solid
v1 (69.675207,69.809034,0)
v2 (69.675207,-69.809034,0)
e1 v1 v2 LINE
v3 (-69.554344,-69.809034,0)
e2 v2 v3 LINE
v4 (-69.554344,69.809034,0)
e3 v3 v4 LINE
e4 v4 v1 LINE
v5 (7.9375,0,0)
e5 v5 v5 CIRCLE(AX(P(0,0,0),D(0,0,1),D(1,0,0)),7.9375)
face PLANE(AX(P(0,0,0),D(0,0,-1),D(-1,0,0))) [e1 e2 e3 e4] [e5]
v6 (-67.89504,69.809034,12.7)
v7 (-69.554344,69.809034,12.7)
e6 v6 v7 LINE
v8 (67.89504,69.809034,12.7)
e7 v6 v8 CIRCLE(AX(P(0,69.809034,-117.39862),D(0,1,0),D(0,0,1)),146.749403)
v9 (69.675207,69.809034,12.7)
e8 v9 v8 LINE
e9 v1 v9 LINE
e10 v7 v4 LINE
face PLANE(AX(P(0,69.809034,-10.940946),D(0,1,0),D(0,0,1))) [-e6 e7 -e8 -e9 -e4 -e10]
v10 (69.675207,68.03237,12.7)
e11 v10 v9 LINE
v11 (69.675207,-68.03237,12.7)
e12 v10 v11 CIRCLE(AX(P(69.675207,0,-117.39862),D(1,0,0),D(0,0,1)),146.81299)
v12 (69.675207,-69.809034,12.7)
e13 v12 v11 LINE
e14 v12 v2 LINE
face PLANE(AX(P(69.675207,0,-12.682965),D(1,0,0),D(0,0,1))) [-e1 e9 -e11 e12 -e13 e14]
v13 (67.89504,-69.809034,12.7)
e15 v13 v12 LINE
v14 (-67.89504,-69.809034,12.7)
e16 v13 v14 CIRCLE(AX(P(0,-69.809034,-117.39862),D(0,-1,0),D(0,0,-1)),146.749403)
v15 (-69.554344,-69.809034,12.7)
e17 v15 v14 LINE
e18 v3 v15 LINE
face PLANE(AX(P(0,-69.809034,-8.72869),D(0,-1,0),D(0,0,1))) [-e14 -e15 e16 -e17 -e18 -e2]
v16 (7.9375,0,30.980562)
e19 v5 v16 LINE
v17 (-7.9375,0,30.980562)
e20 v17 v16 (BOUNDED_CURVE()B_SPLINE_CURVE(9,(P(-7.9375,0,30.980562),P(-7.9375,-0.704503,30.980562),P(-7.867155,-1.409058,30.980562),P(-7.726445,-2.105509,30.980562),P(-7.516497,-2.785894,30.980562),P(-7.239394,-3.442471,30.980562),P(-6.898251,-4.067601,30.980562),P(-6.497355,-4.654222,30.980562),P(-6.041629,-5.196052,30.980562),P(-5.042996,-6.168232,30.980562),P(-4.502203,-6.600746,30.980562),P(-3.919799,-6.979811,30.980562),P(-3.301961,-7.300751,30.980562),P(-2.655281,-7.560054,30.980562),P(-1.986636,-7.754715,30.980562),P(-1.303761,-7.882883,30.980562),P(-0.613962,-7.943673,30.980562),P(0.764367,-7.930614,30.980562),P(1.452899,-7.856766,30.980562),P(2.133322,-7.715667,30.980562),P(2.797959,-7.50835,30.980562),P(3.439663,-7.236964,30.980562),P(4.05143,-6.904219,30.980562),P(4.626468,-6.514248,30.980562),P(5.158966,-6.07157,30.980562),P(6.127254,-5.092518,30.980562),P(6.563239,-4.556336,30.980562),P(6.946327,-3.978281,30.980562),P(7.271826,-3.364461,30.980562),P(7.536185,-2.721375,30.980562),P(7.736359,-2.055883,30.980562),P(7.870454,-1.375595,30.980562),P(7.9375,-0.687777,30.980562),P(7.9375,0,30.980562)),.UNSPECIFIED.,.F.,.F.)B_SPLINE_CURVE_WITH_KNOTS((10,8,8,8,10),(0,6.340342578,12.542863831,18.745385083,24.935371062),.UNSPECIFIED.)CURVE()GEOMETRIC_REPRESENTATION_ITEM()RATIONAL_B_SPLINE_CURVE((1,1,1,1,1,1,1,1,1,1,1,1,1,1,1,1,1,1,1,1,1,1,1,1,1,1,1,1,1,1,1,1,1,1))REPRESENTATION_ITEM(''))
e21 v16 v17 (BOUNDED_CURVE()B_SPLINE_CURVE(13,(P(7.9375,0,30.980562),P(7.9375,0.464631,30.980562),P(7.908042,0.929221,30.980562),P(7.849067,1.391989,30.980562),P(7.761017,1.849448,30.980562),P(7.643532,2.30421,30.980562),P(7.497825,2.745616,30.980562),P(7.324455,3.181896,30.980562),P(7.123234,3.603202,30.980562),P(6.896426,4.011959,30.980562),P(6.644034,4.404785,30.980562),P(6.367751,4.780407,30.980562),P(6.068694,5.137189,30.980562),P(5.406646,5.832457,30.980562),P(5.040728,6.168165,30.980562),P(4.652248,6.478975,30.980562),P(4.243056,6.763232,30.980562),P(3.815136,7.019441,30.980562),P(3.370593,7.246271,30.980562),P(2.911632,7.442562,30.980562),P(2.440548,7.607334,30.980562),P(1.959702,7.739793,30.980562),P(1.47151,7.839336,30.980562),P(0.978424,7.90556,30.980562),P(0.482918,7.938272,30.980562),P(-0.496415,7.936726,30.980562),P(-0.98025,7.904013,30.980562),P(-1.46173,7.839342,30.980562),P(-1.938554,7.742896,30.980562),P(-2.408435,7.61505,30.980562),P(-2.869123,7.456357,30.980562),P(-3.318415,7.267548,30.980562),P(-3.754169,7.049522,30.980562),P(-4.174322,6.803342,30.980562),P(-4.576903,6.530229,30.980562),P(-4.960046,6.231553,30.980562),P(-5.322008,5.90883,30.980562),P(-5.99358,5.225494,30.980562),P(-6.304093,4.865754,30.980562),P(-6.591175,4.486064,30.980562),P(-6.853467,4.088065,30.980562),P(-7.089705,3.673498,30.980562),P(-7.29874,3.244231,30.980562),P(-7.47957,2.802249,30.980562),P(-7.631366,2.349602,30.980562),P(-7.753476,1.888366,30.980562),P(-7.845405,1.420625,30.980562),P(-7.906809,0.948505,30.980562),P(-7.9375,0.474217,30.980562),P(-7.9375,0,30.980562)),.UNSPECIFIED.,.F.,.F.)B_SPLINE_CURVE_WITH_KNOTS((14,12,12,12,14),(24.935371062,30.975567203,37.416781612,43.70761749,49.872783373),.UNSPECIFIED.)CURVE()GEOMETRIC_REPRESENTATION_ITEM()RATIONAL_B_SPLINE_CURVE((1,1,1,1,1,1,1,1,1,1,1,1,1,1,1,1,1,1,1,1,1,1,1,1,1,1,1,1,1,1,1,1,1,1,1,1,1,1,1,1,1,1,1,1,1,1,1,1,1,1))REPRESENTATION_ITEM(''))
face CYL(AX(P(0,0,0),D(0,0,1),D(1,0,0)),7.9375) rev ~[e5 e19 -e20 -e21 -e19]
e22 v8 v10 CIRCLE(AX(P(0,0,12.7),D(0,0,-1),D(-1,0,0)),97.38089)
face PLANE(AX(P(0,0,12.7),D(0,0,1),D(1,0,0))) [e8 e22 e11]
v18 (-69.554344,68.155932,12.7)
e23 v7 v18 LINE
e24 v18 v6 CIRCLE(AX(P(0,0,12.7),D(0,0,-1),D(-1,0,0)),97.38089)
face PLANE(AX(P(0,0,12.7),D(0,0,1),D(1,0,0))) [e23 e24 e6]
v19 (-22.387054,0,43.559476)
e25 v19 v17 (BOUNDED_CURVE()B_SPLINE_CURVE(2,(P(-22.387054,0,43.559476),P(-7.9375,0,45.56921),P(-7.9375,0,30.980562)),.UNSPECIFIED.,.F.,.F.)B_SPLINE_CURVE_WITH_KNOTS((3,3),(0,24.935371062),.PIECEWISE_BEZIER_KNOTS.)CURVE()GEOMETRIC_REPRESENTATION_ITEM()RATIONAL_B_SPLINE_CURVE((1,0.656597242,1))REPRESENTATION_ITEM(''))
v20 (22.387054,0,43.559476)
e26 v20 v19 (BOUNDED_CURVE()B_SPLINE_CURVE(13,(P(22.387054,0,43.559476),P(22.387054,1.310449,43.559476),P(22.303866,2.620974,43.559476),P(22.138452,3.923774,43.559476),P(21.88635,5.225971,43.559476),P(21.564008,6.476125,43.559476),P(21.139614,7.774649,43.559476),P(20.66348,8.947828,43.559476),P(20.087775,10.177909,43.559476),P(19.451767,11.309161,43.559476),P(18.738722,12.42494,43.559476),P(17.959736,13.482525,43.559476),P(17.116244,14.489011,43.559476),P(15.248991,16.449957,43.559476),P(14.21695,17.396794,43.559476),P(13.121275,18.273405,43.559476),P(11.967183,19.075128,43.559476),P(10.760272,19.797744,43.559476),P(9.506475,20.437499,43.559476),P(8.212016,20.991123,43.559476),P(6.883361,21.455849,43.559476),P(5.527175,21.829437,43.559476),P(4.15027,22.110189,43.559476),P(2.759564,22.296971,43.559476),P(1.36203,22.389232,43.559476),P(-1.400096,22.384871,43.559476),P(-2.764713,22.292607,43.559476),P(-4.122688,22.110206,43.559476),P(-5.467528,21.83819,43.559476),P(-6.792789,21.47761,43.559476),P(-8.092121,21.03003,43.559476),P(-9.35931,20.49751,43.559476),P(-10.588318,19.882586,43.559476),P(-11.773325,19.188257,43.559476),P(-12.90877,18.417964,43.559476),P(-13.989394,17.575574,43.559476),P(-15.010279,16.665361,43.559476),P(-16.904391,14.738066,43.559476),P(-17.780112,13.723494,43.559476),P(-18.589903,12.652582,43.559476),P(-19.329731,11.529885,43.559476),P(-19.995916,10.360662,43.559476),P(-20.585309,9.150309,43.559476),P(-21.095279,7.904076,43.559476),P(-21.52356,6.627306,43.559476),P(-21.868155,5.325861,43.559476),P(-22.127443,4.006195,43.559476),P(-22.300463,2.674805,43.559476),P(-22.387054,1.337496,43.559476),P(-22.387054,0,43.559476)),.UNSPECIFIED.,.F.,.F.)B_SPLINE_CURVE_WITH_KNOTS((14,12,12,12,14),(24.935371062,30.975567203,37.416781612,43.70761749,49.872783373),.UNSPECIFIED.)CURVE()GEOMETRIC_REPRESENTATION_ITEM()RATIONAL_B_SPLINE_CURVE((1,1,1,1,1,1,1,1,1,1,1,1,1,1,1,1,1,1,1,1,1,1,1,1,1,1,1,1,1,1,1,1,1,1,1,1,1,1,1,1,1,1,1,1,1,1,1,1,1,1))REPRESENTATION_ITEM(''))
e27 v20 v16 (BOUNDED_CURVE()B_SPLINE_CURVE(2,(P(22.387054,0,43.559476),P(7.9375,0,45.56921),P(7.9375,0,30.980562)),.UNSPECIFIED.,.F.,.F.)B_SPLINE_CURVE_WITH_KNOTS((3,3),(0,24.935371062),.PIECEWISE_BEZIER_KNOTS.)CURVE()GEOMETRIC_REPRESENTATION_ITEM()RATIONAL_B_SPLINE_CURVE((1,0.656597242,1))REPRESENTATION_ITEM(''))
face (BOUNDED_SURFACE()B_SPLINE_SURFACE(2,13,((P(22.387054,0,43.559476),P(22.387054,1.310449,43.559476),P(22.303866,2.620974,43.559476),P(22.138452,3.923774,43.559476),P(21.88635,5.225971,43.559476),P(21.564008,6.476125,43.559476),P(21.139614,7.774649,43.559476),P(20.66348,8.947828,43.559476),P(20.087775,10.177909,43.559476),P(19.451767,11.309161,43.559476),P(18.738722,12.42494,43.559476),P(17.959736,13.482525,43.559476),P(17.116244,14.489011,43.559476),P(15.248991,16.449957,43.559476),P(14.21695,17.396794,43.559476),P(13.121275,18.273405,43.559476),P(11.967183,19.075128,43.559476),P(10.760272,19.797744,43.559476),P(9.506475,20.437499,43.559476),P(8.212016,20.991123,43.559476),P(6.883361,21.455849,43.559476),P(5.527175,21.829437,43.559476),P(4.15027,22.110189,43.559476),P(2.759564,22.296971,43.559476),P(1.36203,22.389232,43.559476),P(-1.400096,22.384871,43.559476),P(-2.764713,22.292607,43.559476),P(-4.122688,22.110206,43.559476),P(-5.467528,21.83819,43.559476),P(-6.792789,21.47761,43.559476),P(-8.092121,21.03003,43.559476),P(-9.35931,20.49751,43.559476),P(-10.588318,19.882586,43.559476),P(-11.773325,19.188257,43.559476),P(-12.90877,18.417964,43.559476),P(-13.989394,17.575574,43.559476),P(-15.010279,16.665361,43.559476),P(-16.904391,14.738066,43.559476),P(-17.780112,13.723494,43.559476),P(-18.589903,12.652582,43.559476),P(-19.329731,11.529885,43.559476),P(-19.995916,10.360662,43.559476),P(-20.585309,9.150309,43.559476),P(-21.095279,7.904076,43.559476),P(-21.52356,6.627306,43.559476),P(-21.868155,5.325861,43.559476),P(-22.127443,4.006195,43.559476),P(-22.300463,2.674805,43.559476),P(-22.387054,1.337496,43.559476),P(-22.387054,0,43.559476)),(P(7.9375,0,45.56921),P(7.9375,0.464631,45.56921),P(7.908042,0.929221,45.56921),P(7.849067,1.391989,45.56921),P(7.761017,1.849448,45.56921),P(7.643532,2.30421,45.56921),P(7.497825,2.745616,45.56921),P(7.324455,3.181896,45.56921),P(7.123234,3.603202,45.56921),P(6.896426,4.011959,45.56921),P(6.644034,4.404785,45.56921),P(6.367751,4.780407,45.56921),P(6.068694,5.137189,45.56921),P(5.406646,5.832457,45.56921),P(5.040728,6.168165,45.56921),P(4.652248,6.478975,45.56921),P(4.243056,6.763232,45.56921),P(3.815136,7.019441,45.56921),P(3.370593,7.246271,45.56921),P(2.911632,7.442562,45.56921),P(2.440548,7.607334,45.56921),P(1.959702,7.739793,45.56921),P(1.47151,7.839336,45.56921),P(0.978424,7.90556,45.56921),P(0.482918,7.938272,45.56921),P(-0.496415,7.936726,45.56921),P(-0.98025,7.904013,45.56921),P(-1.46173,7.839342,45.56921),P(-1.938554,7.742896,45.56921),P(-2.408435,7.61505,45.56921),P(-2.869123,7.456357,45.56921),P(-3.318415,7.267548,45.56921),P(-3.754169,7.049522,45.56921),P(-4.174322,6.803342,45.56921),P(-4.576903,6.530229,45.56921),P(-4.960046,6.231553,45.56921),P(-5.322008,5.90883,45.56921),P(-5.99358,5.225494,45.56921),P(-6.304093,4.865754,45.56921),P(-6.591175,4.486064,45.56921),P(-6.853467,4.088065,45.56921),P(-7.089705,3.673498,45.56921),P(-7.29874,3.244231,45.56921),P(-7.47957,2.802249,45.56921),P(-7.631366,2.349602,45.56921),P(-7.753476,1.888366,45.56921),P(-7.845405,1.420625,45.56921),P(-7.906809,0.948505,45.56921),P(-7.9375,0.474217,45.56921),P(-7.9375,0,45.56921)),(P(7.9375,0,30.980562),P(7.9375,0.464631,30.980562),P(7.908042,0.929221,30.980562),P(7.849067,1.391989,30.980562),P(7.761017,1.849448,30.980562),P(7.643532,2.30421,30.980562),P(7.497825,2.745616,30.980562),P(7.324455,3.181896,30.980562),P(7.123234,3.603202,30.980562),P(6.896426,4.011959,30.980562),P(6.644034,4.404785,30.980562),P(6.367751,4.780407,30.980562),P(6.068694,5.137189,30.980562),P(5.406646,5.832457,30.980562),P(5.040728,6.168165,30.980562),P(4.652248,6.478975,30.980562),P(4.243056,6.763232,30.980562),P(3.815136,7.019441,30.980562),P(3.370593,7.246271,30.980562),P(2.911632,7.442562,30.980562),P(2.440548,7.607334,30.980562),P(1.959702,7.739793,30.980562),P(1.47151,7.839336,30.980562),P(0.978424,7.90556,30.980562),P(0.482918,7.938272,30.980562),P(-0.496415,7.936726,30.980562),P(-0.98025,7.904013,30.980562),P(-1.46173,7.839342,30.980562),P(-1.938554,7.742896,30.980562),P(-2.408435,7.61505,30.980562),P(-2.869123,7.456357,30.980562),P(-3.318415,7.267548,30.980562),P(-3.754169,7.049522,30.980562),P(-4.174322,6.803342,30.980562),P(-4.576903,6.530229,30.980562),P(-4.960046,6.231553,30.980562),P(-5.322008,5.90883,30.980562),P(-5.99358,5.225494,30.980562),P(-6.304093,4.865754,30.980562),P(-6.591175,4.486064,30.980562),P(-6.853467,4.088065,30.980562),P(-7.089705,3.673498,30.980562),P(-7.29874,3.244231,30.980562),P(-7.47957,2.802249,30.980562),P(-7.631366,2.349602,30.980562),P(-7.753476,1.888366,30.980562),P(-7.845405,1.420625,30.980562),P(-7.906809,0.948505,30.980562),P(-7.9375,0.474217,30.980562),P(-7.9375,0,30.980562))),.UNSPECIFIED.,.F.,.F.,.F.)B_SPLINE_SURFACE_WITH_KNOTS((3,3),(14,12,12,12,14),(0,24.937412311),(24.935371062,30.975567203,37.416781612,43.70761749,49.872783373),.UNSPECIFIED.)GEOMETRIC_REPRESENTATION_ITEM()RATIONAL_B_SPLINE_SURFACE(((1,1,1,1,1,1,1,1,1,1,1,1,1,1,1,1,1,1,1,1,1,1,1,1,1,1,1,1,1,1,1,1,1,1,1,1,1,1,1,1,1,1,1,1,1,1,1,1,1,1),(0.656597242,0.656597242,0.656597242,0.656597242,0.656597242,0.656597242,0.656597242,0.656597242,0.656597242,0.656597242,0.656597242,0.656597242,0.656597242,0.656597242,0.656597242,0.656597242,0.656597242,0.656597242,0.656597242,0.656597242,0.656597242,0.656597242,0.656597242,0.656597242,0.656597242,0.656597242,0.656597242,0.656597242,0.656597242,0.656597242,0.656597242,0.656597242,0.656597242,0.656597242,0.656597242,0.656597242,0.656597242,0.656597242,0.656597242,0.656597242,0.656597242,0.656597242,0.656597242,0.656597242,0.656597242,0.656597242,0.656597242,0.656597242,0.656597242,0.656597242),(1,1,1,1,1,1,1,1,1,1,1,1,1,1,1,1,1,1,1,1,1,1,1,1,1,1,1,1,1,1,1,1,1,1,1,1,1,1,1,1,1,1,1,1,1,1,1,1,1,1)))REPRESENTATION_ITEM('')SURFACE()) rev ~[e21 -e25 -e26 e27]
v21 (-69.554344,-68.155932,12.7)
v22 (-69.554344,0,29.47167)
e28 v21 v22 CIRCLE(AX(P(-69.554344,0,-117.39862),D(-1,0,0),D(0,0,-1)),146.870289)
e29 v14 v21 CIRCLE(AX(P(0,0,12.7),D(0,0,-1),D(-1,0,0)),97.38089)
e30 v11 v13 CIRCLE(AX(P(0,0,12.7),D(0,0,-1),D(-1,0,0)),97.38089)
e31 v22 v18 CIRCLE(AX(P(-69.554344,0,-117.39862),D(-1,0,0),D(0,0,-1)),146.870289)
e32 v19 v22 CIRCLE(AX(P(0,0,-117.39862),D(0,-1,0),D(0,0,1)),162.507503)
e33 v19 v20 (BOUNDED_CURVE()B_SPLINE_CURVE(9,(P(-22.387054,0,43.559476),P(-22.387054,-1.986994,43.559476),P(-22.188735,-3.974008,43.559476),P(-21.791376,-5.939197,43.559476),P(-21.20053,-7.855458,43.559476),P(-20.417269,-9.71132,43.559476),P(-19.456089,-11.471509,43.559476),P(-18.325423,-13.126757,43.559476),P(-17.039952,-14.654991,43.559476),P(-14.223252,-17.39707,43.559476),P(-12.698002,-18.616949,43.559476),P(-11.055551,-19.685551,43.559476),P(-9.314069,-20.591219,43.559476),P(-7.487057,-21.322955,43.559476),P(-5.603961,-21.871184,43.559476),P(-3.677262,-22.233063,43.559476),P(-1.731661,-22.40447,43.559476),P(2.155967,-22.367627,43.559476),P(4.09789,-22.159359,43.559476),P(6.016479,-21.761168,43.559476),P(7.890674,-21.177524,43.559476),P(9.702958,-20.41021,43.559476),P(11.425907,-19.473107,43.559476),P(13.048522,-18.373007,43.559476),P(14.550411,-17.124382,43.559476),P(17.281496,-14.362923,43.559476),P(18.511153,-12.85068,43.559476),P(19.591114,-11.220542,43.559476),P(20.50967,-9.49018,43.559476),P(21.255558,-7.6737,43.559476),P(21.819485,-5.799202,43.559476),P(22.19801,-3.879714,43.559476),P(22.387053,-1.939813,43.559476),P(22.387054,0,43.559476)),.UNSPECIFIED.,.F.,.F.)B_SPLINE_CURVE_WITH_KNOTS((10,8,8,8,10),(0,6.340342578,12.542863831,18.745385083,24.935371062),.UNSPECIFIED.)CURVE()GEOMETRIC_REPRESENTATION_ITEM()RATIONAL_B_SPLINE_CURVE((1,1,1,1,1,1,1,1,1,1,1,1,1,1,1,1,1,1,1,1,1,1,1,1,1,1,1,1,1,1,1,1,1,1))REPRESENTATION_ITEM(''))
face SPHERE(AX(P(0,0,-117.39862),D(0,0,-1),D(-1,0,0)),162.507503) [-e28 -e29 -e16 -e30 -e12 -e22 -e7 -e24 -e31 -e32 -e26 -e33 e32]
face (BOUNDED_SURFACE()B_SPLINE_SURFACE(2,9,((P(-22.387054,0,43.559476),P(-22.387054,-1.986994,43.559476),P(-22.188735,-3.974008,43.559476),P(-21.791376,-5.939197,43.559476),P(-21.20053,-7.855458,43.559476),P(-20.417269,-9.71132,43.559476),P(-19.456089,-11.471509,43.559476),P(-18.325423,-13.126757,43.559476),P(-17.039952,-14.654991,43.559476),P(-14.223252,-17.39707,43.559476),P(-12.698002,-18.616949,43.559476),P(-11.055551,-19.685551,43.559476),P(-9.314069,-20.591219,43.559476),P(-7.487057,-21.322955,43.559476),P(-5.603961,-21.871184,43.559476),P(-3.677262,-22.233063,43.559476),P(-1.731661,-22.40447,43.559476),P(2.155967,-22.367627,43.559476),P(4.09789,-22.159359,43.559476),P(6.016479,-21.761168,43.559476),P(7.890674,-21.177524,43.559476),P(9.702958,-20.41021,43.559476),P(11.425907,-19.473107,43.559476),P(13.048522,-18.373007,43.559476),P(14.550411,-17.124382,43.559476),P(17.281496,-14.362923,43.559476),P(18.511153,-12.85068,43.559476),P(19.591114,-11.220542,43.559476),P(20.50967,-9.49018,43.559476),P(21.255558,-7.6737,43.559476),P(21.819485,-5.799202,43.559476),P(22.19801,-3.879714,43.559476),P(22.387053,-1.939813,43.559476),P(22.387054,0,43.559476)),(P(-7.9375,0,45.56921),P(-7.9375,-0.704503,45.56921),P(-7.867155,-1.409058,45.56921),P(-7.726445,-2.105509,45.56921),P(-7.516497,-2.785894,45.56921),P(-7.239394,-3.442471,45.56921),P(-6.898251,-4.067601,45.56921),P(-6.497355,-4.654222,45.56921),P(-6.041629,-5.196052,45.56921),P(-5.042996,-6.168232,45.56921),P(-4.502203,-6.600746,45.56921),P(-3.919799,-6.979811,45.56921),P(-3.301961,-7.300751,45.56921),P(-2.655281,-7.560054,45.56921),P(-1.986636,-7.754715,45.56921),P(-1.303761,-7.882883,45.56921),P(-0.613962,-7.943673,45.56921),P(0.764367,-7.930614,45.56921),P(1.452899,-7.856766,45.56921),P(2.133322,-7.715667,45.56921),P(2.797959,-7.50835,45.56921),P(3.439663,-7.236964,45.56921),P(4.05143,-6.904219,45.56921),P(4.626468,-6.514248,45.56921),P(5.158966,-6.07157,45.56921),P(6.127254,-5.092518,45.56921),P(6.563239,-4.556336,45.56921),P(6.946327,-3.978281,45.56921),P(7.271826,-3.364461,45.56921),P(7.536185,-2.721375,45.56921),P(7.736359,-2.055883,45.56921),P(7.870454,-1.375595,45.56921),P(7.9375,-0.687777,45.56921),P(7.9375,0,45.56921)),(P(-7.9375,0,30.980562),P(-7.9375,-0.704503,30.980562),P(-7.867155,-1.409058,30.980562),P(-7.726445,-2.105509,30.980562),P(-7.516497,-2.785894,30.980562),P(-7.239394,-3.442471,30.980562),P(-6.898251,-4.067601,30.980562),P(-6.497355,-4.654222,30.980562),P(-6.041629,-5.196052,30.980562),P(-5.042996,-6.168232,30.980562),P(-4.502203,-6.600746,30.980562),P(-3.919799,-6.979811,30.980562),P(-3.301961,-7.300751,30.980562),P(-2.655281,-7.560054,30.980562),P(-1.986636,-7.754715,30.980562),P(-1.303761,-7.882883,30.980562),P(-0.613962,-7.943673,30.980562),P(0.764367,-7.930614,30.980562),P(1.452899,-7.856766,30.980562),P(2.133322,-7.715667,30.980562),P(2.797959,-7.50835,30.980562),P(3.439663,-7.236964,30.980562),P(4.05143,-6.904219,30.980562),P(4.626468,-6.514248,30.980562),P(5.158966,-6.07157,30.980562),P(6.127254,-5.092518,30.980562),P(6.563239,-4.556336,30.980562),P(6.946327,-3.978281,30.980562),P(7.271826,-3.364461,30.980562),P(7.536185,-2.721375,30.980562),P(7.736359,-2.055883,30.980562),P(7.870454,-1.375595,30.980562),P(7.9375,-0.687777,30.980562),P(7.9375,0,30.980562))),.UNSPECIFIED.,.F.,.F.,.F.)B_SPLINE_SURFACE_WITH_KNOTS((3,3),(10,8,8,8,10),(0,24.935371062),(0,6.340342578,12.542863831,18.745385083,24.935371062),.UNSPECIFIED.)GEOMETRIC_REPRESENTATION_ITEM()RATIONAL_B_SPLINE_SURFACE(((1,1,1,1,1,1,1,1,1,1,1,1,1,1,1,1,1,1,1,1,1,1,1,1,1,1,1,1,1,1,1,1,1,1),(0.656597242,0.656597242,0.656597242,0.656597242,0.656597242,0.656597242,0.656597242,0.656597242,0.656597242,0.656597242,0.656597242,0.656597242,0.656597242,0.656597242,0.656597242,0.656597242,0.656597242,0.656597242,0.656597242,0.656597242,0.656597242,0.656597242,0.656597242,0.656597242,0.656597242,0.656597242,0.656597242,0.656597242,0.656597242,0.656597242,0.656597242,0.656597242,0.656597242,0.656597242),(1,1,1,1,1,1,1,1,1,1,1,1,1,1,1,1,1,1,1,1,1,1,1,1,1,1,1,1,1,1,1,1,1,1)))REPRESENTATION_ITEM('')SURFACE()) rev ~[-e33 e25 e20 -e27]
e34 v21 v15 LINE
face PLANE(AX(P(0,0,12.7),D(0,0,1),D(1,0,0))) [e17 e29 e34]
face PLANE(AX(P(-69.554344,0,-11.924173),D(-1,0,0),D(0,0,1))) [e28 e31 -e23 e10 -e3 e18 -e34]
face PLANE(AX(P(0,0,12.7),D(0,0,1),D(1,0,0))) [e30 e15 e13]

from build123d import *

# Parameters (mm, degrees)
F0_W     = 139.7
F0_H     = 139.7
F0_R     = 7.9375
F1_DEPTH = 12.7
F4_W     = 59.6992075443
F4_H     = 63.3541112766
F4_W_2   = 56.6389337182
F4_H_2   = 62.1770434082
F5_DEPTH = 101.6
F6_W     = 47.2303777933
F6_H     = 39.3290324137
F6_W_2   = 46.0887253284
F6_H_2   = 41.5412890725
F7_DEPTH = 101.6
F9_DEPTH = 76.2
F10_R    = 12.7


# Not quite as in the source:
# - a feature names something its author has since deleted; it is built from what else it names


with BuildPart() as f1:
    # F0 (on Top) → F1 (new body)
    with BuildSketch(Plane.XY):
        Rectangle(F0_W, F0_H)
        Circle(F0_R, mode=Mode.SUBTRACT)
    extrude(amount=F1_DEPTH)

    # F2 (on Front) → F3 (revolve)
    with BuildSketch(Plane.XZ):
        with BuildLine():
            Line((0, 0), (0, 45.1088836892))
            ThreePointArc((0, 45.1088836892), (-60.5414406288, 33.4106062222), (-112.3665997793, 0))
            Line((-112.3665997793, 0), (0, 0))
        make_face()
    revolve(axis=Axis((0, 0, 22.5544418446), (0, 0, -1)))

    # F4 (on Front) → F5 (cut, symmetric)
    with BuildSketch(Plane.XZ):
        with Locations((-99.4039475918, 19.7528828867)):
            Rectangle(F4_W, F4_H)
        with Locations((97.9946739972, 18.4055566788)):
            Rectangle(F4_W_2, F4_H_2)
    extrude(amount=F5_DEPTH, both=True, mode=Mode.SUBTRACT)

    # F6 (on Right) → F7 (cut, symmetric)
    with BuildSketch(Plane.YZ):
        with Locations((-93.4242233634, 10.9358266927)):
            Rectangle(F6_W, F6_H)
        with Locations((92.853397131, 9.8296983633)):
            Rectangle(F6_W_2, F6_H_2)
    extrude(amount=F7_DEPTH, both=True, mode=Mode.SUBTRACT)

    # F0 (on Top) → F9 (cut, symmetric)
    with BuildSketch(Plane.XY):
        Circle(F0_R)
    extrude(amount=F9_DEPTH, both=True, mode=Mode.SUBTRACT)

    # F10
    f10_edges = [f1.edges().sort_by_distance(p)[0] for p in [
        (0, -7.9375, 44.914919),
        (0, 7.9375, 44.914919),
    ]]
    fillet(f10_edges, radius=F10_R)


solid = f1.part
